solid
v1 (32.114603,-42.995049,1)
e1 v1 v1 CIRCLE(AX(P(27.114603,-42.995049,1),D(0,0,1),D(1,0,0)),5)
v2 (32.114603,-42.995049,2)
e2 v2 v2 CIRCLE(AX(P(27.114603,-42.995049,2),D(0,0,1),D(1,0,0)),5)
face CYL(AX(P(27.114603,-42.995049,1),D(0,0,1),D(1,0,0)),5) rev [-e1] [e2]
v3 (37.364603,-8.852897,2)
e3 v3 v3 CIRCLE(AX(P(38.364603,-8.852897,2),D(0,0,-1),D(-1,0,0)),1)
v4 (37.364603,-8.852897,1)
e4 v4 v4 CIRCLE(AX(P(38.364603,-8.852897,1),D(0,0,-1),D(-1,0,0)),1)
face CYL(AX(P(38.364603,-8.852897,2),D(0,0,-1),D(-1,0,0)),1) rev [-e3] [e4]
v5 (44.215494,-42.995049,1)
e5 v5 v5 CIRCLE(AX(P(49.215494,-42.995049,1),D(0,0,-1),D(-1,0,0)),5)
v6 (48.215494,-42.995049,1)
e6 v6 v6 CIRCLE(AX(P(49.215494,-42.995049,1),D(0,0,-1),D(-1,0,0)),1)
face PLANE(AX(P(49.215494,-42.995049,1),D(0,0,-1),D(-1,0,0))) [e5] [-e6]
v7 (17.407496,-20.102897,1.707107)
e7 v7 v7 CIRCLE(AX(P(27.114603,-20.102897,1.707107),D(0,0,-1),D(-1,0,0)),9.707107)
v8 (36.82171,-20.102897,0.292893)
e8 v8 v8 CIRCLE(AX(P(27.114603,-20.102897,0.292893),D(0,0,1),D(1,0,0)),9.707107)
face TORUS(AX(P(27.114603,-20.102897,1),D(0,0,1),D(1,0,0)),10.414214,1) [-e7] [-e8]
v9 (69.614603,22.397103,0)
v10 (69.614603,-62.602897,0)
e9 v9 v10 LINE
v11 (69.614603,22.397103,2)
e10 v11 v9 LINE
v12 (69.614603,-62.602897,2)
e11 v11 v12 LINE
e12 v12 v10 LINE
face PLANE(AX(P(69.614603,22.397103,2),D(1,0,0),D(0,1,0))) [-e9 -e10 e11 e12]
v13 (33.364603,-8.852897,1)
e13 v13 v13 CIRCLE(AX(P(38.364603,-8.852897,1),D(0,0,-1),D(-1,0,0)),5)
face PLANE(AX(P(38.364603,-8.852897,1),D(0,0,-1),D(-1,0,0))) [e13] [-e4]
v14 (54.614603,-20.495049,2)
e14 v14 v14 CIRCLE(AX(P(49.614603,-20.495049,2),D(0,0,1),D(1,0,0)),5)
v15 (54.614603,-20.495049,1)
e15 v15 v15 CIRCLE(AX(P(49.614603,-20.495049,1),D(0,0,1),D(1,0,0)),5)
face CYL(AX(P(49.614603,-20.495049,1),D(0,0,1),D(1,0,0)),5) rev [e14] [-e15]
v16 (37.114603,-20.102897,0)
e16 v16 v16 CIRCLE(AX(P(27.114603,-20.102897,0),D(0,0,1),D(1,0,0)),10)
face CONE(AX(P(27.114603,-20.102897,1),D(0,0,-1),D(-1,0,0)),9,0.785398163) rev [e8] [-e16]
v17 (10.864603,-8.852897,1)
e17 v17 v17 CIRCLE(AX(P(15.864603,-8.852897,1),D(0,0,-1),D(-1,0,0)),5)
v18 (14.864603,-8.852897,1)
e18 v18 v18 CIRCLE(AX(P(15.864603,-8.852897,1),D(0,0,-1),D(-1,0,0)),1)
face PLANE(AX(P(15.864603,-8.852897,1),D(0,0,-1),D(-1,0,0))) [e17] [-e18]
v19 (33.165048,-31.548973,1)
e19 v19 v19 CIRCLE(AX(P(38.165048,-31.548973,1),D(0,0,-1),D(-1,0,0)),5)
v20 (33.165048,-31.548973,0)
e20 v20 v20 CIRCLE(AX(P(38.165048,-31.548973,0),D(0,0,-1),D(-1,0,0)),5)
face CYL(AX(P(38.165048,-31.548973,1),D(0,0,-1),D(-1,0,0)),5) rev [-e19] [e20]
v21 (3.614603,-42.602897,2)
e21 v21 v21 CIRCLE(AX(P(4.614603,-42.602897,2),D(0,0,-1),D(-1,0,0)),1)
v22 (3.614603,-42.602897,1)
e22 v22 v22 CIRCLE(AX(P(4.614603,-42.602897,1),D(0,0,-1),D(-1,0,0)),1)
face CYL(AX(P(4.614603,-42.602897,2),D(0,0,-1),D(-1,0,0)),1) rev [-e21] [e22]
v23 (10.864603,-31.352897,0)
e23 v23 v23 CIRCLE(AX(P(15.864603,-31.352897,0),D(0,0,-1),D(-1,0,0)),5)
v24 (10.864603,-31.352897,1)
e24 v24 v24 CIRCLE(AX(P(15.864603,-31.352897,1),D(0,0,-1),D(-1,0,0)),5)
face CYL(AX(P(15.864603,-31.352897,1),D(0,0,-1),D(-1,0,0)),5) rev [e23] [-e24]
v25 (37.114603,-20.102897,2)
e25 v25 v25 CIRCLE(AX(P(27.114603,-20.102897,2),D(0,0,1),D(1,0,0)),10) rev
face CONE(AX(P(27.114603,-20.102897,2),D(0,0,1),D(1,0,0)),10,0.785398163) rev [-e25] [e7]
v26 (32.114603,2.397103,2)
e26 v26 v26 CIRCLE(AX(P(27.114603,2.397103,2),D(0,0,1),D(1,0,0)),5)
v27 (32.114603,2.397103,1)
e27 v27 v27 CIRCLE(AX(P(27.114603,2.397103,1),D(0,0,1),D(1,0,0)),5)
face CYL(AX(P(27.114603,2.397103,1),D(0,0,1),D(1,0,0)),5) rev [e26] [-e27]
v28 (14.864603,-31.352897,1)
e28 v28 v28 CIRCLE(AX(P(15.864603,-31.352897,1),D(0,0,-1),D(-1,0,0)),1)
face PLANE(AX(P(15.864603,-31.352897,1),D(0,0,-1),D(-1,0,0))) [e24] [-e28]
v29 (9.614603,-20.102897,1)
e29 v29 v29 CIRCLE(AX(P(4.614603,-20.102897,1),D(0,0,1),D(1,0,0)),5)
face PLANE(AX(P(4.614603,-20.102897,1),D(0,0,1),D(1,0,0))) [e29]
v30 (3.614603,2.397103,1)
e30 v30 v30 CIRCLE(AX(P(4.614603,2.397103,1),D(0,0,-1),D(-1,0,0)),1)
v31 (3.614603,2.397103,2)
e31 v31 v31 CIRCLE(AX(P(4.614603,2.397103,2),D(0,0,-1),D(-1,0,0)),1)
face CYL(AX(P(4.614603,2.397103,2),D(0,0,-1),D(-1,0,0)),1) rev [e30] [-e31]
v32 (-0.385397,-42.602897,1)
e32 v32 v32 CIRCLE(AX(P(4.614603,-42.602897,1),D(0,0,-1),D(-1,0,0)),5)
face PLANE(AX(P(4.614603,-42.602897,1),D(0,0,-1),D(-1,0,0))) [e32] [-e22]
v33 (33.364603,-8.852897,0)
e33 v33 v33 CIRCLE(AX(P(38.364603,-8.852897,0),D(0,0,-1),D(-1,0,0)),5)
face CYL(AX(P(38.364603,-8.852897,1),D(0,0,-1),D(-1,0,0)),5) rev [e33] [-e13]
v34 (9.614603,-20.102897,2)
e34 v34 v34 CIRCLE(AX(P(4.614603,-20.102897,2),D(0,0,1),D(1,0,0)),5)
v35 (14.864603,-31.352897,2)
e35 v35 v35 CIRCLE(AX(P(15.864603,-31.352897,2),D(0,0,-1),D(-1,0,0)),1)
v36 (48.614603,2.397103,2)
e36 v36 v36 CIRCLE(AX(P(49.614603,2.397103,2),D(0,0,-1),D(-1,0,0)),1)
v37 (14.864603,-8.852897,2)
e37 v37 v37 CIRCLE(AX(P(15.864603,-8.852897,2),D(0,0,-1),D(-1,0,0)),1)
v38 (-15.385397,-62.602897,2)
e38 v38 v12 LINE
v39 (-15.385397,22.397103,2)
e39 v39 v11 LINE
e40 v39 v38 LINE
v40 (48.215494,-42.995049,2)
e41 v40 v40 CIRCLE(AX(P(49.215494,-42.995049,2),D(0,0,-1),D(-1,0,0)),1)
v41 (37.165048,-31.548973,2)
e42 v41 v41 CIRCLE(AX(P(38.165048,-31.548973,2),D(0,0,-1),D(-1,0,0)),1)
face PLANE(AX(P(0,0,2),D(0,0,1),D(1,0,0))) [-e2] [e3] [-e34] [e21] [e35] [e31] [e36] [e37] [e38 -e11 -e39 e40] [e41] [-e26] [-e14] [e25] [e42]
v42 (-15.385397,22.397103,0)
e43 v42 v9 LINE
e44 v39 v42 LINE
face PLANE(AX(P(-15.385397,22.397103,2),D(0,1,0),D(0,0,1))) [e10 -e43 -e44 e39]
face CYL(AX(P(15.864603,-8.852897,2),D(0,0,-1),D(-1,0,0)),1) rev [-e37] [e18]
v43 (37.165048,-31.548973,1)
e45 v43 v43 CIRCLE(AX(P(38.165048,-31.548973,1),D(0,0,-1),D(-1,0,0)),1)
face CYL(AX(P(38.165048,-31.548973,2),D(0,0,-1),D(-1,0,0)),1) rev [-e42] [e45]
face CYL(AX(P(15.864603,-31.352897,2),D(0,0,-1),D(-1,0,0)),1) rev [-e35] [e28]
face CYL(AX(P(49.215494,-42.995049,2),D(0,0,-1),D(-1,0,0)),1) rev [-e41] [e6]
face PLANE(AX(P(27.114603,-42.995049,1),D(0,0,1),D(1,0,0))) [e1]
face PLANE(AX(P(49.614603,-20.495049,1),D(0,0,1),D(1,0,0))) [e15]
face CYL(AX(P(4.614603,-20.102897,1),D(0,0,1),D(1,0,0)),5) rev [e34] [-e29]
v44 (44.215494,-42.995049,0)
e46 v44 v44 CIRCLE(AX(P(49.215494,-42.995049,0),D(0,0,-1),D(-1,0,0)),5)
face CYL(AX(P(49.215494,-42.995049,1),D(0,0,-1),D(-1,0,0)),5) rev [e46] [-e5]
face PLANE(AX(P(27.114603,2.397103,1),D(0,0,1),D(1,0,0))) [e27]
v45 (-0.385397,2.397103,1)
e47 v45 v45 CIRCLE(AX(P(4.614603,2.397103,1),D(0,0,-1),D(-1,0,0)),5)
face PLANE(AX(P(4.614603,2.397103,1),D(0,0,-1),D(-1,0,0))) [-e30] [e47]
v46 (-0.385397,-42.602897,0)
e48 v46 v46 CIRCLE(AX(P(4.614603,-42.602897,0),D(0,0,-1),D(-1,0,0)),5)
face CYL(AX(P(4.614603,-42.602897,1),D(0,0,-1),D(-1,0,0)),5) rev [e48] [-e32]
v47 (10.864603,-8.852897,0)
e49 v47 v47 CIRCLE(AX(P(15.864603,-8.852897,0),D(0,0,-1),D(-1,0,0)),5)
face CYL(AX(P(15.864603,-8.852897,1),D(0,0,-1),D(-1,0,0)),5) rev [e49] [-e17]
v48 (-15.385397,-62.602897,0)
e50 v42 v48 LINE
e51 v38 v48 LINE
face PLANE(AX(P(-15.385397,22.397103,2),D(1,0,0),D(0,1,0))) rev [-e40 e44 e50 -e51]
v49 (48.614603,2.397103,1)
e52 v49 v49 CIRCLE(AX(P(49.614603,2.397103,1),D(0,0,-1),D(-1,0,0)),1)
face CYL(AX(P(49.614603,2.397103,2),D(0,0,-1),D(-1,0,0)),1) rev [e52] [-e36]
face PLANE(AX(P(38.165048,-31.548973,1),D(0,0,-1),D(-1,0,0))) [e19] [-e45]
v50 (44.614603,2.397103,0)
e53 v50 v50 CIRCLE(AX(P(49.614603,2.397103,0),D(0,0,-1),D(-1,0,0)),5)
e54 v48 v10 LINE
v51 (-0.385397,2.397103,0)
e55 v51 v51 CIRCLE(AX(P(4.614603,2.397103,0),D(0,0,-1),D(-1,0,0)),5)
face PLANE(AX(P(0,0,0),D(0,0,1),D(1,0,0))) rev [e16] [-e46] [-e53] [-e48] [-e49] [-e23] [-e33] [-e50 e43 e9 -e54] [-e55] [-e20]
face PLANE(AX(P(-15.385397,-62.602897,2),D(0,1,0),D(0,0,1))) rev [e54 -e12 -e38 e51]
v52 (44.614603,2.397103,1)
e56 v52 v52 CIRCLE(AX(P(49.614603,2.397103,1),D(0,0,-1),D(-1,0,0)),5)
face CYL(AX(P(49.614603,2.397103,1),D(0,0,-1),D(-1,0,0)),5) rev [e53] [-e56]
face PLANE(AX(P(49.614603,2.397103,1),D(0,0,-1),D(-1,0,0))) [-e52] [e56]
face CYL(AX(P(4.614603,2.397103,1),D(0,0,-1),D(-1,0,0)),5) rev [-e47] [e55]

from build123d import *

# Parameters (mm, degrees)
SKETCH_1_W          = 85
SKETCH_1_H          = 85
EXTRUDE_1_DEPTH     = 2
SKETCH_2_R          = 9
CUT_EXTRUDE_1_DEPTH = 2
SKETCH_3_R          = 5
CUT_EXTRUDE_3_DEPTH = 1
SKETCH_4_R          = 5
CUT_EXTRUDE_4_DEPTH = 1
SKETCH_5_R          = 1
CUT_EXTRUDE_5_DEPTH = 94.644624303
CHAMFER_1_SIZE      = 1
CHAMFER_2_SIZE      = 1


with BuildPart() as part:
    # 草图1 → 凸台-拉伸1 (new body)
    with BuildSketch(Plane.XY):
        with Locations((27.114602804, -20.102897196)):
            Rectangle(SKETCH_1_W, SKETCH_1_H)
    extrude(amount=EXTRUDE_1_DEPTH)

    # 草图2 → 切除-拉伸1 (cut)
    with BuildSketch(Plane(origin=(0, 0, 0), x_dir=(-1, 0, 0), z_dir=(0, 0, -1))):
        with Locations((-27.114602804, -20.102897196)):
            Circle(SKETCH_2_R)
    extrude(amount=-CUT_EXTRUDE_1_DEPTH, mode=Mode.SUBTRACT)

    # 草图3 → 切除-拉伸3 (cut)
    with BuildSketch(Plane.XY.offset(2)):
        with Locations((49.614602804, -20.495049302)):
            Circle(SKETCH_3_R)
        with Locations((27.114602804, 2.397102804)):
            Circle(SKETCH_3_R)
        with Locations((27.114602804, -42.995049302)):
            Circle(SKETCH_3_R)
        with Locations((4.614602804, -20.102897196)):
            Circle(SKETCH_3_R)
    extrude(amount=-CUT_EXTRUDE_3_DEPTH, mode=Mode.SUBTRACT)

    # 草图4 → 切除-拉伸4 (cut)
    with BuildSketch(Plane(origin=(0, 0, 0), x_dir=(-1, 0, 0), z_dir=(0, 0, -1))):
        with Locations((-49.215493554, -42.995049302)):
            Circle(SKETCH_4_R)
        with Locations((-38.165048179, -31.548973249)):
            Circle(SKETCH_4_R)
        with Locations((-49.614602804, 2.397102804)):
            Circle(SKETCH_4_R)
        with Locations((-38.364602804, -8.852897196)):
            Circle(SKETCH_4_R)
        with Locations((-4.614602804, -42.602897196)):
            Circle(SKETCH_4_R)
        with Locations((-15.864602804, -31.352897196)):
            Circle(SKETCH_4_R)
        with Locations((-4.614602804, 2.397102804)):
            Circle(SKETCH_4_R)
        with Locations((-15.864602804, -8.852897196)):
            Circle(SKETCH_4_R)
    extrude(amount=-CUT_EXTRUDE_4_DEPTH, mode=Mode.SUBTRACT)

    # 草图5 → 切除-拉伸5 (cut, through all)
    with BuildSketch(Plane(origin=(0, 0, 0), x_dir=(-1, 0, 0), z_dir=(0, 0, -1))):
        with Locations((-4.614602804, -42.602897196)):
            Circle(SKETCH_5_R)
        with Locations((-15.864602804, -31.352897196)):
            Circle(SKETCH_5_R)
        with Locations((-15.864602804, -8.852897196)):
            Circle(SKETCH_5_R)
        with Locations((-4.614602804, 2.397102804)):
            Circle(SKETCH_5_R)
        with Locations((-38.364602804, -8.852897196)):
            Circle(SKETCH_5_R)
        with Locations((-49.614602804, 2.397102804)):
            Circle(SKETCH_5_R)
        with Locations((-49.215493554, -42.995049302)):
            Circle(SKETCH_5_R)
        with Locations((-38.165048179, -31.548973249)):
            Circle(SKETCH_5_R)
    extrude(amount=-CUT_EXTRUDE_5_DEPTH, mode=Mode.SUBTRACT)

    # 倒角1
    chamfer_1_edges = [part.edges().sort_by_distance(p)[0] for p in [
        (36.114602804, -20.102897196, 0),
    ]]
    chamfer(chamfer_1_edges, length=CHAMFER_1_SIZE)

    # 倒角2
    chamfer_2_edges = [part.edges().sort_by_distance(p)[0] for p in [
        (36.114602804, -20.102897196, 2),
    ]]
    chamfer(chamfer_2_edges, length=CHAMFER_2_SIZE - 0.0001)  # a hair under: the kernel refuses the full size

    # 圆角1: read off the stored shape, not the designer's step
    # 圆角1 outline → 圆角1 (revolve, cut)
    with BuildSketch(Plane(origin=(27.114602804, -20.102897196, 0), x_dir=(1, 0, 0), z_dir=(0, -1, 0))):
        with BuildLine():
            ThreePointArc((9.707106781, 0.292893219), (9.414213562, 1), (9.707106781, 1.707106781))
            Line((9.707106781, 1.707106781), (0, 1.707106781))
            Line((0, 1.707106781), (0, 0.292893219))
            Line((0, 0.292893219), (9.707106781, 0.292893219))
        make_face()
    revolve(axis=Axis((27.114602804, -20.102897196, 0), (0, 0, 1)), mode=Mode.SUBTRACT)


solid = part.part
